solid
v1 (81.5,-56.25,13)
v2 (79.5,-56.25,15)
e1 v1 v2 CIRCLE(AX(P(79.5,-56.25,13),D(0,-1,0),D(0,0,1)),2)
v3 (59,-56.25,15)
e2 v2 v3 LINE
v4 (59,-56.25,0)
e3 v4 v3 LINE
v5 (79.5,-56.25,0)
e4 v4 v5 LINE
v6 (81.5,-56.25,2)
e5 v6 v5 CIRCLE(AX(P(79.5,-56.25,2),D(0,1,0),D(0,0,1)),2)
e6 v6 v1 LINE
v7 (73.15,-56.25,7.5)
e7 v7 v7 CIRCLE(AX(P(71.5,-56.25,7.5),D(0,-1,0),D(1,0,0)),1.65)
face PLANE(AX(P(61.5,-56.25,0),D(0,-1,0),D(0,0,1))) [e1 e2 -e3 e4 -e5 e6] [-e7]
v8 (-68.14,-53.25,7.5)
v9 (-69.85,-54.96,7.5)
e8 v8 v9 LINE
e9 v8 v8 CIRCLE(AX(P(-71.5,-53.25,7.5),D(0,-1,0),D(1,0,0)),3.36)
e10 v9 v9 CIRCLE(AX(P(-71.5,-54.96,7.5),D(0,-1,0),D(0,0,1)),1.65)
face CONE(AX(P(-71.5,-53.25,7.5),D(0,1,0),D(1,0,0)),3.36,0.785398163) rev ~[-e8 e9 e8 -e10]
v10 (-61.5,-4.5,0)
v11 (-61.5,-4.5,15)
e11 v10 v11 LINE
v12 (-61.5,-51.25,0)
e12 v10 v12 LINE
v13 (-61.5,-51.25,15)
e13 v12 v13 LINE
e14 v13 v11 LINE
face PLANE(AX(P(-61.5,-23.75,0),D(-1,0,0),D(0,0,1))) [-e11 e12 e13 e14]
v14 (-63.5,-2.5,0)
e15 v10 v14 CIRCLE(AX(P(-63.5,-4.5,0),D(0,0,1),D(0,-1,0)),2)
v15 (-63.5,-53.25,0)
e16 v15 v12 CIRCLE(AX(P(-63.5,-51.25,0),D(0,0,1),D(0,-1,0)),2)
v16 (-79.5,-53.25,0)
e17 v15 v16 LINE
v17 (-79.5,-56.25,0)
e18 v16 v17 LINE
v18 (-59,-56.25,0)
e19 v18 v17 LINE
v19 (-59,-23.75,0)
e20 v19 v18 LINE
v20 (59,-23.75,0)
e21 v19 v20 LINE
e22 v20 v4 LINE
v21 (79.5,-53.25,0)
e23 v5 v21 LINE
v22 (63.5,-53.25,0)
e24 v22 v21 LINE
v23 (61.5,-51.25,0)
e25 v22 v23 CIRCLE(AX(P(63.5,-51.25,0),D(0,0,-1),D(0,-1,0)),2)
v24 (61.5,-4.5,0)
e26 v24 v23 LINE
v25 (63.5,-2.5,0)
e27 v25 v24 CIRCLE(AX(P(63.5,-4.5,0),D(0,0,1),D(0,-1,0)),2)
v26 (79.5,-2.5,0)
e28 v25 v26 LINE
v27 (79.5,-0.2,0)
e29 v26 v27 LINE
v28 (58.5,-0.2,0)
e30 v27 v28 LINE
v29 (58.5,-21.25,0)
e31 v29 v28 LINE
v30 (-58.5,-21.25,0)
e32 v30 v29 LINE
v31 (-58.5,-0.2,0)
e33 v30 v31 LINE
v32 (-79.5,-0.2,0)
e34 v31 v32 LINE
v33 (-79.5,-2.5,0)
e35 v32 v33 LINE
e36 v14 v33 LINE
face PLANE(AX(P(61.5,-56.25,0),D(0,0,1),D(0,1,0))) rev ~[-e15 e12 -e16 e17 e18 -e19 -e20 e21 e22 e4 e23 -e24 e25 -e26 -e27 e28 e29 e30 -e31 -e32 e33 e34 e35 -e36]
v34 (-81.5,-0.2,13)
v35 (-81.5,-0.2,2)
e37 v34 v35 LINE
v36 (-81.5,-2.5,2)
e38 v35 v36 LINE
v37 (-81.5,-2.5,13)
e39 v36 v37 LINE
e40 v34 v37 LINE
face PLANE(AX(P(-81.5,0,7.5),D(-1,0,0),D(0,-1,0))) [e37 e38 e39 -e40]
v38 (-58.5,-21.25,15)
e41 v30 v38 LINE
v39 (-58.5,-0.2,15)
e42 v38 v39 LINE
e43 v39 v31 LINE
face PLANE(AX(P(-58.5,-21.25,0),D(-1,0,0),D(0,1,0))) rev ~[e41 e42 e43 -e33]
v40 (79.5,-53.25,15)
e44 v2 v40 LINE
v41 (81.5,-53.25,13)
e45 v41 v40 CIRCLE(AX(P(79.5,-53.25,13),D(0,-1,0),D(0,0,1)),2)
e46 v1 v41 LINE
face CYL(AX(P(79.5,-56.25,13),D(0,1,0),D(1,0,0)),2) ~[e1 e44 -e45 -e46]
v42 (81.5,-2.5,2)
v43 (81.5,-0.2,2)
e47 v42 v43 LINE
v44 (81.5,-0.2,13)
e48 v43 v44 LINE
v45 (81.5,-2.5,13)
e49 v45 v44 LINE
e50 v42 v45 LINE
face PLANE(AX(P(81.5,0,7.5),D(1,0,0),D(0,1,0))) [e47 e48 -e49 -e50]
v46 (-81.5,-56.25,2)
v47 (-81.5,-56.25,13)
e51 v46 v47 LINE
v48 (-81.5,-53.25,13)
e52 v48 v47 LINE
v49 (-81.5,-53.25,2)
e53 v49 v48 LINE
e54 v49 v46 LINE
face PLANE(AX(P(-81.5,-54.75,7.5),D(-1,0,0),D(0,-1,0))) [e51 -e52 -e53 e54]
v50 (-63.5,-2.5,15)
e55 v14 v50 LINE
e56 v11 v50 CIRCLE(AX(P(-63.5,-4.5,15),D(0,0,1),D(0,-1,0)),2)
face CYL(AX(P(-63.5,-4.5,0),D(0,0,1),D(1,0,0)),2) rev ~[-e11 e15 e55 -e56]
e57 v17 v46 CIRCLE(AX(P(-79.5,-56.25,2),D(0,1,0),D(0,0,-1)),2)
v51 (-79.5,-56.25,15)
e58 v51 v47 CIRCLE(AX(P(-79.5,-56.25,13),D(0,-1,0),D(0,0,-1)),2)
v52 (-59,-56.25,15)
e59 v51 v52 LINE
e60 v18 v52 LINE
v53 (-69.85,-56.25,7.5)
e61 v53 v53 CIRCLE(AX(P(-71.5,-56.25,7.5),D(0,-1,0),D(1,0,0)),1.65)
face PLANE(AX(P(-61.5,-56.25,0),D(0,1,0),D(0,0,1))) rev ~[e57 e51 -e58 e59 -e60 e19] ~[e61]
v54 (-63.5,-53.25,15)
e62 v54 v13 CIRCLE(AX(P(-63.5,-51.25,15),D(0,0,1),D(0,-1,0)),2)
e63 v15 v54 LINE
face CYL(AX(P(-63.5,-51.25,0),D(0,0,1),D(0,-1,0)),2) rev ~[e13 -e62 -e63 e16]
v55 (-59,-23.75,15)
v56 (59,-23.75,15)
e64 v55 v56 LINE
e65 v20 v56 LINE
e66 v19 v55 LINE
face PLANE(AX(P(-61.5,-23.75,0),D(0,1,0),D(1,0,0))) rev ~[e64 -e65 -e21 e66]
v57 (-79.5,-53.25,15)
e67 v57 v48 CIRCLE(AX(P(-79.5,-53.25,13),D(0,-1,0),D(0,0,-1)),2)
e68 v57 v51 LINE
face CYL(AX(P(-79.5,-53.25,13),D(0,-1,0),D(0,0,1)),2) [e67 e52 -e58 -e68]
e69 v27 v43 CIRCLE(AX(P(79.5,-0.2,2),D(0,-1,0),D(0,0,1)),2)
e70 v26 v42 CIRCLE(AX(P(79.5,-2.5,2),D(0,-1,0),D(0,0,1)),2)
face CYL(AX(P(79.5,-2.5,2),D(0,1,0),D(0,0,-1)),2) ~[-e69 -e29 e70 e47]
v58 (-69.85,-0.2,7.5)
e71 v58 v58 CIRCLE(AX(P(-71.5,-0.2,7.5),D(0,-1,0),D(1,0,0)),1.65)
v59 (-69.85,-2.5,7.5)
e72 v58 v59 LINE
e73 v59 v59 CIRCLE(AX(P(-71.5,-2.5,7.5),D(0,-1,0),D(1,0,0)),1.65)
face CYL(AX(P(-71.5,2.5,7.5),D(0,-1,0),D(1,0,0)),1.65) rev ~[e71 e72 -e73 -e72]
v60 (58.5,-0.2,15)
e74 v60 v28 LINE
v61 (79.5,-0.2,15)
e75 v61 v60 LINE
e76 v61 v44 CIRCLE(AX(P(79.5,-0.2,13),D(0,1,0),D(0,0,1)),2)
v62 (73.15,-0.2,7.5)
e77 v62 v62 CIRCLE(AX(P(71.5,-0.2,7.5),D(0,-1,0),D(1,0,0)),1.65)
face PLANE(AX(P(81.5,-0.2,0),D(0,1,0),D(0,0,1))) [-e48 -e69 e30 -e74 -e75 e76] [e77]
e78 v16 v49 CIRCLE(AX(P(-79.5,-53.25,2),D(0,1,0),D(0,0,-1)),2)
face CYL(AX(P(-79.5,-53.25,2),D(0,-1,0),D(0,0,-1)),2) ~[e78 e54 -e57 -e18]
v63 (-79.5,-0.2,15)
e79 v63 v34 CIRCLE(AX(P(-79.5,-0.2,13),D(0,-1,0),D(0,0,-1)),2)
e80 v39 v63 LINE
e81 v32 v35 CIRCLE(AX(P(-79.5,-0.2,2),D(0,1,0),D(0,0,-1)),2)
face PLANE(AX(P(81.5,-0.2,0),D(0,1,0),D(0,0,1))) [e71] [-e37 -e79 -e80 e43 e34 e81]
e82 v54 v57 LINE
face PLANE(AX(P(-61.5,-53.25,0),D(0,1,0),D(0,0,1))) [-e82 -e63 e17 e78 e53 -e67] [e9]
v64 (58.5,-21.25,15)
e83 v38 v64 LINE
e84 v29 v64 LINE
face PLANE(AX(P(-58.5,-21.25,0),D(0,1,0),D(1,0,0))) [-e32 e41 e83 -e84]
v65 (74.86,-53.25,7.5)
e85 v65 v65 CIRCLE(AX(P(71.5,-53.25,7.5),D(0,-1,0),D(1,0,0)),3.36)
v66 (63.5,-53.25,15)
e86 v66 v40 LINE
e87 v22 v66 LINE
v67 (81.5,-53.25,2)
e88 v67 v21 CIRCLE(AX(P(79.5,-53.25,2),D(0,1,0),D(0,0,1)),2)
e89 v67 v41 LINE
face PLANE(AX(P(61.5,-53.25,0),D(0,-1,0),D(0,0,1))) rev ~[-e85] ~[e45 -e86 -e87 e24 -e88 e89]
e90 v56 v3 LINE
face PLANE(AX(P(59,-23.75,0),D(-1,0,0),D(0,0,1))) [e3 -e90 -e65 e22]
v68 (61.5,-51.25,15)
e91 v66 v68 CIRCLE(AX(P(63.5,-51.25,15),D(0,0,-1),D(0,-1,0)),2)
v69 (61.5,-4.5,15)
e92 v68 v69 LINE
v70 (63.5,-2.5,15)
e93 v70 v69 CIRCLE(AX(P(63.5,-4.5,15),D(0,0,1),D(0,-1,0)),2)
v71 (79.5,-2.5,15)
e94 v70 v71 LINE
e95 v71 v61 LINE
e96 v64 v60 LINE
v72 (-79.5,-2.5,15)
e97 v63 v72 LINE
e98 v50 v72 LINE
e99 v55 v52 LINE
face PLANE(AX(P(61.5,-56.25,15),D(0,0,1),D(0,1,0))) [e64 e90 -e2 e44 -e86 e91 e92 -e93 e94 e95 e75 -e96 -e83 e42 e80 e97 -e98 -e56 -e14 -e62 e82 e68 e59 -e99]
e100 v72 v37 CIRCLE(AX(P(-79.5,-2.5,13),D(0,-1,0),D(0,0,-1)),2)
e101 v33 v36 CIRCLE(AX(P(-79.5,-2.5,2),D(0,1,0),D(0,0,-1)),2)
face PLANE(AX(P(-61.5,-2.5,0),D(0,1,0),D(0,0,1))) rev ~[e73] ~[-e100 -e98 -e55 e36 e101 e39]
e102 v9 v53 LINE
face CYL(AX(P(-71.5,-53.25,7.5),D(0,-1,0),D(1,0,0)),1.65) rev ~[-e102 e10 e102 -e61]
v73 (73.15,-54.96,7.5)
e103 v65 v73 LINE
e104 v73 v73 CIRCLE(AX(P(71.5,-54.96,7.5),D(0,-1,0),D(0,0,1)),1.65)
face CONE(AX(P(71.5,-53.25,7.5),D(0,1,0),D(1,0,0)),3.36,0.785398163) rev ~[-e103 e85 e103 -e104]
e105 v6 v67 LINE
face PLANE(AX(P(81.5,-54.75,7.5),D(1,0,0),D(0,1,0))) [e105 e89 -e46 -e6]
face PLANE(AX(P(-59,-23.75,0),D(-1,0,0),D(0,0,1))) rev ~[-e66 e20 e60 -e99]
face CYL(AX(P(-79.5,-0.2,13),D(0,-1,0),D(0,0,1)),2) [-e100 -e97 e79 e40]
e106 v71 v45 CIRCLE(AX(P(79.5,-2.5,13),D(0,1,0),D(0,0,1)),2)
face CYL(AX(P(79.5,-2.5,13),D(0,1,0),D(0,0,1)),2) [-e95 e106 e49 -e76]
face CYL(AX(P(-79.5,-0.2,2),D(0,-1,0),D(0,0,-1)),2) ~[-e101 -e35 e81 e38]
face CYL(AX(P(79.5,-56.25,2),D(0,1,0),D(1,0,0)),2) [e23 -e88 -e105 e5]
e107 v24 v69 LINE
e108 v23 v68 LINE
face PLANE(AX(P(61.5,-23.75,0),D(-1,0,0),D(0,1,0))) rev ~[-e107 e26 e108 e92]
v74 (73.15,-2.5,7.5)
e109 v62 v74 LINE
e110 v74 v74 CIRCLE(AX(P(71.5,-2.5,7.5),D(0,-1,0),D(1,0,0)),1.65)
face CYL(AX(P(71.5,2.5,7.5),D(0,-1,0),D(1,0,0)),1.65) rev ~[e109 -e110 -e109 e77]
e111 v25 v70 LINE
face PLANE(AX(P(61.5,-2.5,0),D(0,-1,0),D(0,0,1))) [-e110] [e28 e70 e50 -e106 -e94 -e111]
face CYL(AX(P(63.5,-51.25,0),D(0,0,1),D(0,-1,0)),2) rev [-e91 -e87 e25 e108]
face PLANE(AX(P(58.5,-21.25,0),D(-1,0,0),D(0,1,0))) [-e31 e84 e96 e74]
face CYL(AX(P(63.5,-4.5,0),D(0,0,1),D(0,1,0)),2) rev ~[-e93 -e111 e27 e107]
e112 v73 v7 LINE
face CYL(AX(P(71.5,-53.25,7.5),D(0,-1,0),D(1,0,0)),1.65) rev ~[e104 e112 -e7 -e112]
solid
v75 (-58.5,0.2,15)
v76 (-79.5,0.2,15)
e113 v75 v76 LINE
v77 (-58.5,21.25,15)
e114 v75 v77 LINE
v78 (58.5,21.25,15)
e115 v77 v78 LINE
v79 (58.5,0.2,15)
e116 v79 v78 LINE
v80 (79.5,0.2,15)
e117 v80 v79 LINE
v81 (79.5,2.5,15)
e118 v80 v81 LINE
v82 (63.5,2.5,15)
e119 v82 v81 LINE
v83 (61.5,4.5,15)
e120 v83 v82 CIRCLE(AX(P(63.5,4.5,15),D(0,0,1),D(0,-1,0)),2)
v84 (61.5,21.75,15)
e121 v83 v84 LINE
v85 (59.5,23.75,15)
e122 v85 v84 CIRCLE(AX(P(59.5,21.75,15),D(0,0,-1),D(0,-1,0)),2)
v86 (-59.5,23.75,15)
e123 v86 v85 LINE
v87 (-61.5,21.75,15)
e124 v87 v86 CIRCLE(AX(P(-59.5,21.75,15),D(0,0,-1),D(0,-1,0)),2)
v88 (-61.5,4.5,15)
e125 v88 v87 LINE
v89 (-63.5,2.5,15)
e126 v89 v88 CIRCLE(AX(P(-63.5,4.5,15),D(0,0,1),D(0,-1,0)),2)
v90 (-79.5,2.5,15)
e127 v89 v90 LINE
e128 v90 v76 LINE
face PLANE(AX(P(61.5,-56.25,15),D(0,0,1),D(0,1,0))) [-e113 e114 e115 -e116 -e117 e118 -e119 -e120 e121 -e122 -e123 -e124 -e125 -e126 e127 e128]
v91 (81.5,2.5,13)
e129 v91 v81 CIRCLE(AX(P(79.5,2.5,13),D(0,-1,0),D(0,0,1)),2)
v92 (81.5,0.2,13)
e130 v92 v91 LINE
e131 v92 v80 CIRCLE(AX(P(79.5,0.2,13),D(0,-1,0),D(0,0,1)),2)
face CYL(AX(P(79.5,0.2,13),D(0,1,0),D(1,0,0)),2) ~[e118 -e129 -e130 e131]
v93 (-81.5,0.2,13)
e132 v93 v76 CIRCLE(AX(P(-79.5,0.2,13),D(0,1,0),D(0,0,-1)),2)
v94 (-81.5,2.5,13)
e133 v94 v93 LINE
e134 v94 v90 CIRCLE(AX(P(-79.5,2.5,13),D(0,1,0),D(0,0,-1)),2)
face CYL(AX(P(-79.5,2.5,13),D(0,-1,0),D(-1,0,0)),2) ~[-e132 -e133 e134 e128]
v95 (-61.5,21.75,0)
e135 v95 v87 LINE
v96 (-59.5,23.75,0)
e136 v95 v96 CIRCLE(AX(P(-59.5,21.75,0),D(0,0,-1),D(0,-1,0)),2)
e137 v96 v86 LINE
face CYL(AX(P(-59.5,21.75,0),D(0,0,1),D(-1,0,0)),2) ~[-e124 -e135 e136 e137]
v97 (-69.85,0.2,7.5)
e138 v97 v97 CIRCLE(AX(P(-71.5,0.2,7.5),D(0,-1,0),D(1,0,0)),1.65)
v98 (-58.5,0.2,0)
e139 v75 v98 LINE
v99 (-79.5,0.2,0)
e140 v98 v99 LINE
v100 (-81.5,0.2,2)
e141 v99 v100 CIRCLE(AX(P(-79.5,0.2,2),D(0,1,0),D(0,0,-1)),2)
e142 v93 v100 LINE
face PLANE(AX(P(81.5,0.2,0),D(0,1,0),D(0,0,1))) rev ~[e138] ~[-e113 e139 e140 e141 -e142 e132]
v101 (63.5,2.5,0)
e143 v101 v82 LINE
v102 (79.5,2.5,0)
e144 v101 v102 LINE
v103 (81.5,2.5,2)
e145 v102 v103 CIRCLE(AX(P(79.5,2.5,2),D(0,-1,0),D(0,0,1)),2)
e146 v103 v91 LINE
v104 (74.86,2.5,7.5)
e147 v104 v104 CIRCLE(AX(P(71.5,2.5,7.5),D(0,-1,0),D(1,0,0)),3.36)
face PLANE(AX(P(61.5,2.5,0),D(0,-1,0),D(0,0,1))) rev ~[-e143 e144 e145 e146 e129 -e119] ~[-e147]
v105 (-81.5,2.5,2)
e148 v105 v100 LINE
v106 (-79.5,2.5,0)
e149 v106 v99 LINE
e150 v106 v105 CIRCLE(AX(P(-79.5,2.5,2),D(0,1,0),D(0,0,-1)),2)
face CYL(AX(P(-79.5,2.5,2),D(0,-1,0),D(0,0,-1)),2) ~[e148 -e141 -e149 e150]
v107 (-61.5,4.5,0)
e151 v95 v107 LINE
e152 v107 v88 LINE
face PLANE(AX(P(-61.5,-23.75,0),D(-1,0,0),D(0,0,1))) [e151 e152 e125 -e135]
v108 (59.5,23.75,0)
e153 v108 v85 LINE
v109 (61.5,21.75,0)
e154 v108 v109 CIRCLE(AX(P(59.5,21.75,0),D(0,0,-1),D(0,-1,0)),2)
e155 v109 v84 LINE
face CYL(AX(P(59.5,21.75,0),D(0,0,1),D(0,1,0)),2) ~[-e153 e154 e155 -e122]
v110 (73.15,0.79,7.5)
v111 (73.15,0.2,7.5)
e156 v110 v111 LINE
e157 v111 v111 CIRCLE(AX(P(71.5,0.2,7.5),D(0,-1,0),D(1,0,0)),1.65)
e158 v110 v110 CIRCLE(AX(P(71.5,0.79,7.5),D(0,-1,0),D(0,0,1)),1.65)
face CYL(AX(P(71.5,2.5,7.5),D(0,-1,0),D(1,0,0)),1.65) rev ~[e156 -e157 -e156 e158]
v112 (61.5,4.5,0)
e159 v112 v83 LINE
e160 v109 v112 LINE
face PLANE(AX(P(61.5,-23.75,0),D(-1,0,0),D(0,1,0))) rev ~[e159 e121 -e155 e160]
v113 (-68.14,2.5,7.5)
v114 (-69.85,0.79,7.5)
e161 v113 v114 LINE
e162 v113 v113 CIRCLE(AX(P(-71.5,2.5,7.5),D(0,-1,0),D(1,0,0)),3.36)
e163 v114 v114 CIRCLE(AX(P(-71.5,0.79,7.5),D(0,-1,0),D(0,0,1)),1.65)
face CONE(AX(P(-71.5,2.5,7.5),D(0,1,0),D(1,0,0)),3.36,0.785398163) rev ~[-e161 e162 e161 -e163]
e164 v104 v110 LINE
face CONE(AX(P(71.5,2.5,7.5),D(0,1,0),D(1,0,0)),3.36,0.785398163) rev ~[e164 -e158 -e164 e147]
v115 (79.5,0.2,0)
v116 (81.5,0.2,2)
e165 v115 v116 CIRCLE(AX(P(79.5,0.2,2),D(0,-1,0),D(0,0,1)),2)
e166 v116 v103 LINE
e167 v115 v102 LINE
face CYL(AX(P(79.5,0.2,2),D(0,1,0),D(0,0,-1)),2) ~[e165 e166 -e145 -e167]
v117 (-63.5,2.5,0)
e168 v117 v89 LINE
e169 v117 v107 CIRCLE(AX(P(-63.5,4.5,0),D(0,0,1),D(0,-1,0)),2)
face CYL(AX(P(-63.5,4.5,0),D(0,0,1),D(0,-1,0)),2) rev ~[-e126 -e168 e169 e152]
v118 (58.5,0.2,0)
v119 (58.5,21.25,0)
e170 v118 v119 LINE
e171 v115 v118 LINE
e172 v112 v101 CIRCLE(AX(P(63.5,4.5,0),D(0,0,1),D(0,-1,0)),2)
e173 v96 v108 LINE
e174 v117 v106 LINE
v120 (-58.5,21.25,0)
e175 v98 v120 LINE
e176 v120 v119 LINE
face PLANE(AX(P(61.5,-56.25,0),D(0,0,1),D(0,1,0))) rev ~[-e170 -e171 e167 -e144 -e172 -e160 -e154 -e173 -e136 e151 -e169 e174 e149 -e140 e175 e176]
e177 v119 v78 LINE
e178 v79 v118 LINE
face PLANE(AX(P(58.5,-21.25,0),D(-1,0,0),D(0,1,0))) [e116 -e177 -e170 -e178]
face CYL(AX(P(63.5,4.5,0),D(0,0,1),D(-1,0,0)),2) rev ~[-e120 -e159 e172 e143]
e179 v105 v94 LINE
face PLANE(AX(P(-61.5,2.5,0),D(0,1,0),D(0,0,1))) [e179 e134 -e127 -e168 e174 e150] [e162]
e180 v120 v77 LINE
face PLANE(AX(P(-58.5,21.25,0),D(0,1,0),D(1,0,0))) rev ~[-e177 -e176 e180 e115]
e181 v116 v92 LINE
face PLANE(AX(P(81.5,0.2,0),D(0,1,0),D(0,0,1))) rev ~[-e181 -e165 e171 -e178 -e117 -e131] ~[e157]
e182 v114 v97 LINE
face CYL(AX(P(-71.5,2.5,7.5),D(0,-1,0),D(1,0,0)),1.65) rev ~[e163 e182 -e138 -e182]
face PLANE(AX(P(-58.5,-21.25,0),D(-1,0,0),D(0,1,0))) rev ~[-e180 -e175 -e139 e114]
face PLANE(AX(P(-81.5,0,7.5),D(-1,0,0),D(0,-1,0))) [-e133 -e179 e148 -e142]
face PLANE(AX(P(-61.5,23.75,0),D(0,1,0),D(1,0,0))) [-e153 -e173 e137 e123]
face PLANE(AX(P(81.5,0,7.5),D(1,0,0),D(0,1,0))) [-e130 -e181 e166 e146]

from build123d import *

# Parameters (mm, degrees)
F0_W            = 123
F0_H            = 47.5
F0_W_2          = 117
F0_H_2          = 42.5
F1_DEPTH        = 15
F3_W            = 2.5
F3_H            = 15
F4_DEPTH        = 32.5
F5_W            = 3
F5_H            = 15
F6_DEPTH        = 20
F7_W            = 3
F7_H            = 15
F8_DEPTH        = 20
F10_D           = 3.3
F10_DEPTH       = 5
F10_CSINK_D     = 6.72
F10_CSINK_ANGLE = 90
F10_TIP         = 0.9914200214
F12_D           = 3.3
F12_DEPTH       = 5
F12_CSINK_D     = 6.72
F12_CSINK_ANGLE = 90
F12_TIP         = 0.9914200214
F13_W           = 5
F13_H           = 15
F14_DEPTH       = 20
F16_D           = 3.3
F16_CSINK_D     = 6.72
F16_CSINK_ANGLE = 90
F17_W           = 5
F17_H           = 15
F18_DEPTH       = 20
F20_D           = 3.3
F20_CSINK_D     = 6.72
F20_CSINK_ANGLE = 90
F21_W           = 0.4
F21_H           = 15
F22_DEPTH       = 200
F23_R           = 2


with BuildPart() as f1:
    # F0 (on Top) → F1 (new body)
    with BuildSketch(Plane.XY):
        Rectangle(F0_W, F0_H)
        Rectangle(F0_W_2, F0_H_2, mode=Mode.SUBTRACT)
    extrude(amount=F1_DEPTH)

    # F3 (on face) → F4 (join)
    with BuildSketch(Plane.XZ.offset(23.75)):
        with Locations((-60.25, 7.5)):
            Rectangle(F3_W, F3_H)
        with Locations((60.25, 7.5)):
            Rectangle(F3_W, F3_H)
    extrude(amount=F4_DEPTH)

    # F5 (on face) → F6 (join)
    with BuildSketch(Plane(origin=(-61.5, 0, 0), x_dir=(0, -1, 0), z_dir=(-1, 0, 0))):
        with Locations((54.75, 7.5)):
            Rectangle(F5_W, F5_H)
    extrude(amount=F6_DEPTH)

    # F7 (on face) → F8 (join)
    with BuildSketch(Plane.YZ.offset(61.5)):
        with Locations((-54.75, 7.5)):
            Rectangle(F7_W, F7_H)
    extrude(amount=F8_DEPTH)

    # F10
    with Locations(Plane(origin=(0, -53.25, 0), x_dir=(-1, 0, 0), z_dir=(0, 1, 0))):
        with Locations((-71.5, 7.5)):
            CounterSinkHole(F10_D / 2, F10_CSINK_D / 2, depth=F10_DEPTH, counter_sink_angle=F10_CSINK_ANGLE)
            with Locations((0, 0, -(F10_DEPTH + F10_TIP / 2))):  # 118° drill point
                Cone(0, F10_D / 2, F10_TIP, mode=Mode.SUBTRACT)

    # F12
    with Locations(Plane(origin=(0, -53.25, 0), x_dir=(-1, 0, 0), z_dir=(0, 1, 0))):
        with Locations((71.5, 7.5)):
            CounterSinkHole(F12_D / 2, F12_CSINK_D / 2, depth=F12_DEPTH, counter_sink_angle=F12_CSINK_ANGLE)
            with Locations((0, 0, -(F12_DEPTH + F12_TIP / 2))):  # 118° drill point
                Cone(0, F12_D / 2, F12_TIP, mode=Mode.SUBTRACT)

    # F13 (on face) → F14 (join)
    with BuildSketch(Plane(origin=(-61.5, 0, 0), x_dir=(0, -1, 0), z_dir=(-1, 0, 0))):
        with Locations((0, 7.5)):
            Rectangle(F13_W, F13_H)
    extrude(amount=F14_DEPTH)

    # F16 (through all)
    with Locations(Plane(origin=(0, 2.5, 0), x_dir=(-1, 0, 0), z_dir=(0, 1, 0))):
        with Locations((71.5, 7.5)):
            CounterSinkHole(F16_D / 2, F16_CSINK_D / 2, counter_sink_angle=F16_CSINK_ANGLE)

    # F17 (on face) → F18 (join)
    with BuildSketch(Plane.YZ.offset(61.5)):
        with Locations((0, 7.5)):
            Rectangle(F17_W, F17_H)
    extrude(amount=F18_DEPTH)

    # F20 (through all)
    with Locations(Plane(origin=(0, 2.5, 0), x_dir=(-1, 0, 0), z_dir=(0, 1, 0))):
        with Locations((-71.5, 7.5)):
            CounterSinkHole(F20_D / 2, F20_CSINK_D / 2, counter_sink_angle=F20_CSINK_ANGLE)

    # F21 (on face) → F22 (cut)
    with BuildSketch(Plane.YZ.offset(81.5)):
        with Locations((0, 7.5)):
            Rectangle(F21_W, F21_H)
    extrude(amount=-F22_DEPTH, mode=Mode.SUBTRACT)

    # F23
    f23_edges = [f1.edges().sort_by_distance(p)[0] for p in [
        (-61.5, 23.75, 7.5),
        (-81.5, -1.35, 0),
        (-81.5, 1.35, 0),
        (-81.5, -54.75, 15),
        (81.5, -54.75, 0),
        (81.5, -1.35, 15),
        (81.5, 1.35, 15),
        (61.5, 23.75, 7.5),
        (-61.5, -53.25, 7.5),
        (61.5, -53.25, 7.5),
        (81.5, -1.35, 0),
        (81.5, 1.35, 0),
        (-81.5, -1.35, 15),
        (-81.5, 1.35, 15),
        (-61.5, 2.5, 7.5),
        (-61.5, -2.5, 7.5),
        (61.5, 2.5, 7.5),
        (61.5, -2.5, 7.5),
        (-81.5, -54.75, 0),
        (81.5, -54.75, 15),
    ]]
    fillet(f23_edges, radius=F23_R)


solid = f1.part
